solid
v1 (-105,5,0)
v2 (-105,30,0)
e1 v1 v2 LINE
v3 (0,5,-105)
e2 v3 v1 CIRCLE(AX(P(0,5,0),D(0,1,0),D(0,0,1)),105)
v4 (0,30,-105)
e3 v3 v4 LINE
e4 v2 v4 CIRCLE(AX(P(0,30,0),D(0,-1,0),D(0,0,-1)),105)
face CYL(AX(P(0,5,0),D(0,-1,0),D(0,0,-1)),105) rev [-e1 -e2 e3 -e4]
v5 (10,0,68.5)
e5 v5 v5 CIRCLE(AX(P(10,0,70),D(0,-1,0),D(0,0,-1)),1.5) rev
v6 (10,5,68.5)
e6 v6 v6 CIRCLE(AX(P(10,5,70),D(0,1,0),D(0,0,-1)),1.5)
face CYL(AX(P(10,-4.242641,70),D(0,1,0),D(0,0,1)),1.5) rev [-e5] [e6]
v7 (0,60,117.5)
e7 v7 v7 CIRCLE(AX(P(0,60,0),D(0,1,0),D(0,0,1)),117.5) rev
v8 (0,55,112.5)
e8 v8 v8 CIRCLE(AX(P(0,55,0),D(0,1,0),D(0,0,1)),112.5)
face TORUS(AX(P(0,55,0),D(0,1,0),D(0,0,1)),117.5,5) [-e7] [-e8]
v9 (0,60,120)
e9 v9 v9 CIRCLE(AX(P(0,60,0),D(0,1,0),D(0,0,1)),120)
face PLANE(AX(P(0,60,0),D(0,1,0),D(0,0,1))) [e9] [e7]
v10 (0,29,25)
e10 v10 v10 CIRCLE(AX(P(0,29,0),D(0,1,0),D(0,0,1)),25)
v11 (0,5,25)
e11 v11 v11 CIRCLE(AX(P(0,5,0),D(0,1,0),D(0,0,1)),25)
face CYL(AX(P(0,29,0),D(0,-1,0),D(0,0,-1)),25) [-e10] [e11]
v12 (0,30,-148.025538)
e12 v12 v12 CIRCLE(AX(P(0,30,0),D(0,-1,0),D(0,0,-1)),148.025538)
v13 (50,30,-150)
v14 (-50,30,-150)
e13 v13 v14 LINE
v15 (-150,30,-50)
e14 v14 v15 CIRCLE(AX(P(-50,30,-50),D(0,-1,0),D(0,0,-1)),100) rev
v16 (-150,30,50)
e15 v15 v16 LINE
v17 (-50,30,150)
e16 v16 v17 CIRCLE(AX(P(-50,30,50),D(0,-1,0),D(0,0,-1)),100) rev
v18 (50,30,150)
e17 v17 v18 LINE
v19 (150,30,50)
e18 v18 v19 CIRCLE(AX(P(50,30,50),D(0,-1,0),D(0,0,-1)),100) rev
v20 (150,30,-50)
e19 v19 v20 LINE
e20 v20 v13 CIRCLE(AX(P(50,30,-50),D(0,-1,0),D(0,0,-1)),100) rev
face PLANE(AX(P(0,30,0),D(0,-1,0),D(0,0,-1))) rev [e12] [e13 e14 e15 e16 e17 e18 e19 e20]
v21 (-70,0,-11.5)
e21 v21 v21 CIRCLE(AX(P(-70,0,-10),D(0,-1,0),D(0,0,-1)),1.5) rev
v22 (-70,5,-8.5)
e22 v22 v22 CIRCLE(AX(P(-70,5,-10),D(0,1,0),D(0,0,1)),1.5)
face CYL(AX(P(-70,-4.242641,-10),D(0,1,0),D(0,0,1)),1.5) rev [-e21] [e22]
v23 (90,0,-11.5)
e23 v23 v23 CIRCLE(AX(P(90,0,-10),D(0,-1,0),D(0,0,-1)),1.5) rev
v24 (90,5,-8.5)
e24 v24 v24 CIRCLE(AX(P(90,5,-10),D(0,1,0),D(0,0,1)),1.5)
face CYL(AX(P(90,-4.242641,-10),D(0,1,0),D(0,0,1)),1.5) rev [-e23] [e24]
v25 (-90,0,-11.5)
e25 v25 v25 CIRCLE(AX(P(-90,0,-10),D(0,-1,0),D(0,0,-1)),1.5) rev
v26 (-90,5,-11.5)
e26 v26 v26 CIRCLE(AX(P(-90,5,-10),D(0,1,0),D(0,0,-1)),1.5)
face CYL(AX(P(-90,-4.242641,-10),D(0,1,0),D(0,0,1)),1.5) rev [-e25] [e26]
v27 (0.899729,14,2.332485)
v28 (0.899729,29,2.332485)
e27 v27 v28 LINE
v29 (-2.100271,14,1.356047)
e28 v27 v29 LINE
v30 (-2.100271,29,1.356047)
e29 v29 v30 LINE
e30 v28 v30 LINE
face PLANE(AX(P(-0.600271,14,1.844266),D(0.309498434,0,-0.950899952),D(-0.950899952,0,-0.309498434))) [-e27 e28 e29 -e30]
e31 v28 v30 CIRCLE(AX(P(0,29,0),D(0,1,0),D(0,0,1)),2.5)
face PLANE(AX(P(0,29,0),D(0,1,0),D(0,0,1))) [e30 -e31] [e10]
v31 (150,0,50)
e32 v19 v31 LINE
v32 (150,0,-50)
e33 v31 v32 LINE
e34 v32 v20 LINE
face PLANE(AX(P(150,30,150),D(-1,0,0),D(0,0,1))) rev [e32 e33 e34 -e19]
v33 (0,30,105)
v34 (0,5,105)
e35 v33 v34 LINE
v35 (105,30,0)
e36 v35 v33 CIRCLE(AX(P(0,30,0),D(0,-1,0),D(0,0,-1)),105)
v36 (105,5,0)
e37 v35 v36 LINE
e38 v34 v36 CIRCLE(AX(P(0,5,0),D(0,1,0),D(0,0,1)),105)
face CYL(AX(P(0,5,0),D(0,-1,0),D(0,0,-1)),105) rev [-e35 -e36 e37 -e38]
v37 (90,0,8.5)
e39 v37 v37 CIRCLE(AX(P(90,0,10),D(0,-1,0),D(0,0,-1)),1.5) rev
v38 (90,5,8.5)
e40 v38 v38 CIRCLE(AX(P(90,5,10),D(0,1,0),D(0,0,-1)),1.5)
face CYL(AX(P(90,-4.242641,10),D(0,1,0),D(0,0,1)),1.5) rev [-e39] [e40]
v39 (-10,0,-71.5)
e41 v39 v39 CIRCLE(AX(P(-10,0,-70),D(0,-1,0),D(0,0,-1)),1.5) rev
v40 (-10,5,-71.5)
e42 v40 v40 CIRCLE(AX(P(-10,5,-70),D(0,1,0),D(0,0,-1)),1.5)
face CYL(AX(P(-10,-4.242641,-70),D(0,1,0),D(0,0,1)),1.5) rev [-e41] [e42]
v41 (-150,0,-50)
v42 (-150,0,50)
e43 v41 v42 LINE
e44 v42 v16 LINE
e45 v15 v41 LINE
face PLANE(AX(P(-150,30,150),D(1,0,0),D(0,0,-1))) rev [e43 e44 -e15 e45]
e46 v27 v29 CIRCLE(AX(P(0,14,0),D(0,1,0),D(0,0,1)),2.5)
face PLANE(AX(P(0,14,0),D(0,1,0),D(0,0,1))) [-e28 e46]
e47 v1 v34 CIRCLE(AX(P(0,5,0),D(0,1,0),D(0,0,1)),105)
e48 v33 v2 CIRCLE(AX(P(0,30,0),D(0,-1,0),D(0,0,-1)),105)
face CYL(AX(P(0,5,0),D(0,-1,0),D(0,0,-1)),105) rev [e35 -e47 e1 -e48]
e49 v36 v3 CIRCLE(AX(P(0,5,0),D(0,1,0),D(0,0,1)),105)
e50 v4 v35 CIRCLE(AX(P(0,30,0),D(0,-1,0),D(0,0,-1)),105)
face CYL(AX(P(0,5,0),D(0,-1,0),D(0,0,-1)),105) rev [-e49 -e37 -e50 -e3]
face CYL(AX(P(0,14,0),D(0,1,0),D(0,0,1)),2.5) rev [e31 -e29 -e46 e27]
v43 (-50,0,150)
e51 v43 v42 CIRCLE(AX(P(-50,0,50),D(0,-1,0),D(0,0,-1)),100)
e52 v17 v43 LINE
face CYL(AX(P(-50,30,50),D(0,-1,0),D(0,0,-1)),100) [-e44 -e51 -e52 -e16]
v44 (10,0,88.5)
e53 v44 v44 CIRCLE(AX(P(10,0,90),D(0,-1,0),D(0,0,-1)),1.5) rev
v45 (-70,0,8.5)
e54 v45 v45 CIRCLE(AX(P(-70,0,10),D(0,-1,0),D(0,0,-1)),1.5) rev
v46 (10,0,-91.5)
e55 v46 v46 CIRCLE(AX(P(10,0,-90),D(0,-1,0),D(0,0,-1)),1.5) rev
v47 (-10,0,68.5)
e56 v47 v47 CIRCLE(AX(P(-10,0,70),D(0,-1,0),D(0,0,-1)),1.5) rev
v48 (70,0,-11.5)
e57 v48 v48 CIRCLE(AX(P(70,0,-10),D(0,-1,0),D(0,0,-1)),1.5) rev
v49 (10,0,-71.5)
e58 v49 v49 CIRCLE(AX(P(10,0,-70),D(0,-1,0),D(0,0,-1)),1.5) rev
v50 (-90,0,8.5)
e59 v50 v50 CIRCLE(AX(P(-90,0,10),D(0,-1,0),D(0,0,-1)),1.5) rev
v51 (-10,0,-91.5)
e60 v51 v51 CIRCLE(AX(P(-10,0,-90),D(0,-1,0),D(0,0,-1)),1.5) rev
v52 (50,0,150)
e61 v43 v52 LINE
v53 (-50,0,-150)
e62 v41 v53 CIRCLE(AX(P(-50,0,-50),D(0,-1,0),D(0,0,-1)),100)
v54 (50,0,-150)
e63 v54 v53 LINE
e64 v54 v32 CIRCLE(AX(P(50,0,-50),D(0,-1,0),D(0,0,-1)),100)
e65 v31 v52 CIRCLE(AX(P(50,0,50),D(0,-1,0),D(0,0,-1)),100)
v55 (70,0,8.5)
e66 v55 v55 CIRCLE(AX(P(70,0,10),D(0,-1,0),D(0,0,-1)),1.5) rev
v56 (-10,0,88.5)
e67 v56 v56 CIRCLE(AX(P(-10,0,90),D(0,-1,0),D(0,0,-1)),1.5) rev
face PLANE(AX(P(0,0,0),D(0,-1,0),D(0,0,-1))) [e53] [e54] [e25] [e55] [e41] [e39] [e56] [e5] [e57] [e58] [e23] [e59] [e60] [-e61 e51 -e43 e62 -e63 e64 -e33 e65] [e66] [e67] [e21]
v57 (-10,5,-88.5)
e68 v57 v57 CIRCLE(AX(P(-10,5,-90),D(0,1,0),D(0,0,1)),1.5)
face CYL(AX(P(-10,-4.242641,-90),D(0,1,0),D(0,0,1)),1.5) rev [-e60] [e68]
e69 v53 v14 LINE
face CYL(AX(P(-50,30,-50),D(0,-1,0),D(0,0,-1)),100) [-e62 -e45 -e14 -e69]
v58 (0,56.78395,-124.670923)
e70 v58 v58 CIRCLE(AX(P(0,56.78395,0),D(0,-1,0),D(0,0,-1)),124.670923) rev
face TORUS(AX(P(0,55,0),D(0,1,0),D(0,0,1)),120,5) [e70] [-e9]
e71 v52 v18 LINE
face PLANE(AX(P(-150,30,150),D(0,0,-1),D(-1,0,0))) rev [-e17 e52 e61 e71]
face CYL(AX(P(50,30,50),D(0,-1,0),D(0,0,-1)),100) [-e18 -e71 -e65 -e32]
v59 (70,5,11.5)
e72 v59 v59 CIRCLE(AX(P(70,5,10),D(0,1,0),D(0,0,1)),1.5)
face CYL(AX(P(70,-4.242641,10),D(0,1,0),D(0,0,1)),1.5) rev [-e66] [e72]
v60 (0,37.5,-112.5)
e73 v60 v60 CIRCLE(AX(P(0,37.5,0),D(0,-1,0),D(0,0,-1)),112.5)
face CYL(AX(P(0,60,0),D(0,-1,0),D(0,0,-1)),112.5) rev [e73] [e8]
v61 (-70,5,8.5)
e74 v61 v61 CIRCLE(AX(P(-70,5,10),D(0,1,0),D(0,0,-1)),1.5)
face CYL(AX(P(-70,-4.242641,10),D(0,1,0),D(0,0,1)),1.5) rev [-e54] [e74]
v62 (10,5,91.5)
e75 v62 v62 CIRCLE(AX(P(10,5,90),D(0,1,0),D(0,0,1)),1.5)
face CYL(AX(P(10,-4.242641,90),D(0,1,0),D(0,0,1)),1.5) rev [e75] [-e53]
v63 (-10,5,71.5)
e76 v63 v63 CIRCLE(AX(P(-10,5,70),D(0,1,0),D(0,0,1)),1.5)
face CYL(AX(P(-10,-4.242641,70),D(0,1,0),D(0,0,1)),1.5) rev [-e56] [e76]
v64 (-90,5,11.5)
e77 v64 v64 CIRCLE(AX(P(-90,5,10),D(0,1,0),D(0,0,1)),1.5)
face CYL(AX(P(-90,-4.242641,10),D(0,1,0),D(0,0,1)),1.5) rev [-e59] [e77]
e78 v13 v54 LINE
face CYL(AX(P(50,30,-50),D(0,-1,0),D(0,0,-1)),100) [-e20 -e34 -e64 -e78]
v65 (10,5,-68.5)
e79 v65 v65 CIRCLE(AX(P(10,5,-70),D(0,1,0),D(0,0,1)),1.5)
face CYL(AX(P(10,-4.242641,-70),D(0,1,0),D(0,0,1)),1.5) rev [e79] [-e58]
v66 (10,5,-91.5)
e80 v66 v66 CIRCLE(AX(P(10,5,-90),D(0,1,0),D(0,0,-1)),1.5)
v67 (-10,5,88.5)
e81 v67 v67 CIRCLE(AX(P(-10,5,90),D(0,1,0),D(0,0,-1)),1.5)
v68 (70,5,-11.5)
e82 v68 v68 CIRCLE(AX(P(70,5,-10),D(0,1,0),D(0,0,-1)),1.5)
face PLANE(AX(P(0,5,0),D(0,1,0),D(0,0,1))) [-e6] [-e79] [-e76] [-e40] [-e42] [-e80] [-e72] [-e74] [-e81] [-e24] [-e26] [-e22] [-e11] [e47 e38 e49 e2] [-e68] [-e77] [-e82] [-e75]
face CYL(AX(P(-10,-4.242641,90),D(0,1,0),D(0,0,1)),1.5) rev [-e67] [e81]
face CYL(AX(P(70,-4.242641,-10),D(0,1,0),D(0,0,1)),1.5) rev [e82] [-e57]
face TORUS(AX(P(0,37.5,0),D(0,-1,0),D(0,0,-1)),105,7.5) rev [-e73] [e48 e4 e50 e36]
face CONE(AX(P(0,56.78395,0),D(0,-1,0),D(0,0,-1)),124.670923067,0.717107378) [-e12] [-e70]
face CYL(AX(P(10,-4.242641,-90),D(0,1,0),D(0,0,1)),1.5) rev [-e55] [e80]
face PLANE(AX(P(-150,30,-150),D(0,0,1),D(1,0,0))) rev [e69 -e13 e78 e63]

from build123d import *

# Parameters (mm, degrees)
SKETCH1_W           = 300
SKETCH1_H           = 300
BOSS_EXTRUDE1_DEPTH = 30
SKETCH2_W           = 210
SKETCH2_H           = 210
CUT_EXTRUDE1_DEPTH  = 25
SKETCH6_R           = 25
BOSS_EXTRUDE3_DEPTH = 24
SKETCH4_R           = 1.5
CUT_EXTRUDE3_DEPTH  = 5
CUT_EXTRUDE4_DEPTH  = 15
FILLET1_R           = 105
SKETCH5_R           = 125
SKETCH5_R_2         = 112.5
BOSS_EXTRUDE2_DEPTH = 30
FILLET5_R           = 7.5
FILLET6_R           = 5
FILLET7_R           = 100


with BuildPart() as part:
    # Sketch1 → Boss-Extrude1 (new body)
    with BuildSketch(Plane(origin=(0, 0, 0), x_dir=(1, 0, 0), z_dir=(0, 1, 0))):
        Rectangle(SKETCH1_W, SKETCH1_H)
    extrude(amount=BOSS_EXTRUDE1_DEPTH)

    # Sketch2 → Cut-Extrude1 (cut)
    with BuildSketch(Plane(origin=(0, 30, 0), x_dir=(1, 0, 0), z_dir=(0, 1, 0))):
        Rectangle(SKETCH2_W, SKETCH2_H)
    extrude(amount=-CUT_EXTRUDE1_DEPTH, mode=Mode.SUBTRACT)

    # Sketch6 → Boss-Extrude3 (add)
    with BuildSketch(Plane(origin=(0, 5, 0), x_dir=(1, 0, 0), z_dir=(0, 1, 0))):
        with Locations(Location((0, 0, 0), (0, 0, 270))):
            Circle(SKETCH6_R)
    extrude(amount=BOSS_EXTRUDE3_DEPTH)

    # Sketch4 → Cut-Extrude3 (cut)
    with BuildSketch(Plane(origin=(0, 5, 0), x_dir=(1, 0, 0), z_dir=(0, 1, 0))):
        with Locations(Location((90, 10, 0), (0, 0, 270))):
            Circle(SKETCH4_R)
        with Locations(Location((90, -10, 0), (0, 0, 90))):
            Circle(SKETCH4_R)
        with Locations(Location((70, -10, 0), (0, 0, 270))):
            Circle(SKETCH4_R)
        with Locations(Location((70, 10, 0), (0, 0, 90))):
            Circle(SKETCH4_R)
        with Locations(Location((-90, -10, 0), (0, 0, 270))):
            Circle(SKETCH4_R)
        with Locations(Location((-70, -10, 0), (0, 0, 90))):
            Circle(SKETCH4_R)
        with Locations(Location((-70, 10, 0), (0, 0, 270))):
            Circle(SKETCH4_R)
        with Locations(Location((-90, 10, 0), (0, 0, 90))):
            Circle(SKETCH4_R)
        with Locations(Location((10, -70, 0), (0, 0, 90))):
            Circle(SKETCH4_R)
        with Locations(Location((10, -90, 0), (0, 0, 270))):
            Circle(SKETCH4_R)
        with Locations(Location((-10, -90, 0), (0, 0, 90))):
            Circle(SKETCH4_R)
        with Locations(Location((-10, -70, 0), (0, 0, 270))):
            Circle(SKETCH4_R)
        with Locations(Location((10, 70, 0), (0, 0, 270))):
            Circle(SKETCH4_R)
        with Locations(Location((10, 90, 0), (0, 0, 90))):
            Circle(SKETCH4_R)
        with Locations(Location((-10, 70, 0), (0, 0, 90))):
            Circle(SKETCH4_R)
        with Locations(Location((-10, 90, 0), (0, 0, 270))):
            Circle(SKETCH4_R)
    extrude(amount=-CUT_EXTRUDE3_DEPTH, mode=Mode.SUBTRACT)

    # Sketch7 → Cut-Extrude4 (cut)
    with BuildSketch(Plane(origin=(0, 29, 0), x_dir=(1, 0, 0), z_dir=(0, 1, 0))):
        with BuildLine():
            Line((-2.100270755, -1.356046738), (0.899729245, -2.332485217))
            ThreePointArc((0.899729245, -2.332485217), (2.061470726, -1.414333215), (2.5, 0))
            ThreePointArc((2.5, 0), (-0.706867425, 2.397986331), (-2.100270755, -1.356046738))
        make_face()
    extrude(amount=-CUT_EXTRUDE4_DEPTH, mode=Mode.SUBTRACT)

    # Fillet1
    fillet1_edges = [part.edges().sort_by_distance(p)[0] for p in [
        (-105, 17.5, 105),
        (105, 17.5, 105),
        (105, 17.5, -105),
        (-105, 17.5, -105),
    ]]
    fillet(fillet1_edges, radius=FILLET1_R - 0.0001)  # a hair under: the kernel refuses the full size

    # Sketch5 → Boss-Extrude2 (add)
    with BuildSketch(Plane(origin=(0, 30, 0), x_dir=(1, 0, 0), z_dir=(0, 1, 0))):
        with Locations(Location((0, 0, 0), (0, 0, 90))):
            Circle(SKETCH5_R)
        with Locations(Location((0, 0, 0), (0, 0, 270))):
            Circle(SKETCH5_R_2, mode=Mode.SUBTRACT)
    extrude(amount=BOSS_EXTRUDE2_DEPTH)

    # Fillet5
    fillet5_edges = [part.edges().sort_by_distance(p)[0] for p in [
        (0, 30, -112.5),
    ]]
    fillet(fillet5_edges, radius=FILLET5_R - 0.0001)  # a hair under: the kernel refuses the full size

    # Fillet6
    fillet6_edges = [part.edges().sort_by_distance(p)[0] for p in [
        (0, 60, 125),
        (0, 60, -112.5),
    ]]
    fillet(fillet6_edges, radius=FILLET6_R)

    # Chamfer1: read off the stored shape, not the designer's step
    # Chamfer1 outline → Chamfer1 (revolve)
    with BuildSketch(Plane.XY):
        Polygon((124.670923067, 56.783950028), (124.670923067, 55), (125, 55), (125, 30), (148.025538402, 30), align=None)
    revolve(axis=Axis((0, 0, 0), (0, 1, 0)))

    # Fillet7
    fillet7_edges = [part.edges().sort_by_distance(p)[0] for p in [
        (150, 15, 150),
        (-150, 15, 150),
        (-150, 15, -150),
        (150, 15, -150),
    ]]
    fillet(fillet7_edges, radius=FILLET7_R)


solid = part.part
